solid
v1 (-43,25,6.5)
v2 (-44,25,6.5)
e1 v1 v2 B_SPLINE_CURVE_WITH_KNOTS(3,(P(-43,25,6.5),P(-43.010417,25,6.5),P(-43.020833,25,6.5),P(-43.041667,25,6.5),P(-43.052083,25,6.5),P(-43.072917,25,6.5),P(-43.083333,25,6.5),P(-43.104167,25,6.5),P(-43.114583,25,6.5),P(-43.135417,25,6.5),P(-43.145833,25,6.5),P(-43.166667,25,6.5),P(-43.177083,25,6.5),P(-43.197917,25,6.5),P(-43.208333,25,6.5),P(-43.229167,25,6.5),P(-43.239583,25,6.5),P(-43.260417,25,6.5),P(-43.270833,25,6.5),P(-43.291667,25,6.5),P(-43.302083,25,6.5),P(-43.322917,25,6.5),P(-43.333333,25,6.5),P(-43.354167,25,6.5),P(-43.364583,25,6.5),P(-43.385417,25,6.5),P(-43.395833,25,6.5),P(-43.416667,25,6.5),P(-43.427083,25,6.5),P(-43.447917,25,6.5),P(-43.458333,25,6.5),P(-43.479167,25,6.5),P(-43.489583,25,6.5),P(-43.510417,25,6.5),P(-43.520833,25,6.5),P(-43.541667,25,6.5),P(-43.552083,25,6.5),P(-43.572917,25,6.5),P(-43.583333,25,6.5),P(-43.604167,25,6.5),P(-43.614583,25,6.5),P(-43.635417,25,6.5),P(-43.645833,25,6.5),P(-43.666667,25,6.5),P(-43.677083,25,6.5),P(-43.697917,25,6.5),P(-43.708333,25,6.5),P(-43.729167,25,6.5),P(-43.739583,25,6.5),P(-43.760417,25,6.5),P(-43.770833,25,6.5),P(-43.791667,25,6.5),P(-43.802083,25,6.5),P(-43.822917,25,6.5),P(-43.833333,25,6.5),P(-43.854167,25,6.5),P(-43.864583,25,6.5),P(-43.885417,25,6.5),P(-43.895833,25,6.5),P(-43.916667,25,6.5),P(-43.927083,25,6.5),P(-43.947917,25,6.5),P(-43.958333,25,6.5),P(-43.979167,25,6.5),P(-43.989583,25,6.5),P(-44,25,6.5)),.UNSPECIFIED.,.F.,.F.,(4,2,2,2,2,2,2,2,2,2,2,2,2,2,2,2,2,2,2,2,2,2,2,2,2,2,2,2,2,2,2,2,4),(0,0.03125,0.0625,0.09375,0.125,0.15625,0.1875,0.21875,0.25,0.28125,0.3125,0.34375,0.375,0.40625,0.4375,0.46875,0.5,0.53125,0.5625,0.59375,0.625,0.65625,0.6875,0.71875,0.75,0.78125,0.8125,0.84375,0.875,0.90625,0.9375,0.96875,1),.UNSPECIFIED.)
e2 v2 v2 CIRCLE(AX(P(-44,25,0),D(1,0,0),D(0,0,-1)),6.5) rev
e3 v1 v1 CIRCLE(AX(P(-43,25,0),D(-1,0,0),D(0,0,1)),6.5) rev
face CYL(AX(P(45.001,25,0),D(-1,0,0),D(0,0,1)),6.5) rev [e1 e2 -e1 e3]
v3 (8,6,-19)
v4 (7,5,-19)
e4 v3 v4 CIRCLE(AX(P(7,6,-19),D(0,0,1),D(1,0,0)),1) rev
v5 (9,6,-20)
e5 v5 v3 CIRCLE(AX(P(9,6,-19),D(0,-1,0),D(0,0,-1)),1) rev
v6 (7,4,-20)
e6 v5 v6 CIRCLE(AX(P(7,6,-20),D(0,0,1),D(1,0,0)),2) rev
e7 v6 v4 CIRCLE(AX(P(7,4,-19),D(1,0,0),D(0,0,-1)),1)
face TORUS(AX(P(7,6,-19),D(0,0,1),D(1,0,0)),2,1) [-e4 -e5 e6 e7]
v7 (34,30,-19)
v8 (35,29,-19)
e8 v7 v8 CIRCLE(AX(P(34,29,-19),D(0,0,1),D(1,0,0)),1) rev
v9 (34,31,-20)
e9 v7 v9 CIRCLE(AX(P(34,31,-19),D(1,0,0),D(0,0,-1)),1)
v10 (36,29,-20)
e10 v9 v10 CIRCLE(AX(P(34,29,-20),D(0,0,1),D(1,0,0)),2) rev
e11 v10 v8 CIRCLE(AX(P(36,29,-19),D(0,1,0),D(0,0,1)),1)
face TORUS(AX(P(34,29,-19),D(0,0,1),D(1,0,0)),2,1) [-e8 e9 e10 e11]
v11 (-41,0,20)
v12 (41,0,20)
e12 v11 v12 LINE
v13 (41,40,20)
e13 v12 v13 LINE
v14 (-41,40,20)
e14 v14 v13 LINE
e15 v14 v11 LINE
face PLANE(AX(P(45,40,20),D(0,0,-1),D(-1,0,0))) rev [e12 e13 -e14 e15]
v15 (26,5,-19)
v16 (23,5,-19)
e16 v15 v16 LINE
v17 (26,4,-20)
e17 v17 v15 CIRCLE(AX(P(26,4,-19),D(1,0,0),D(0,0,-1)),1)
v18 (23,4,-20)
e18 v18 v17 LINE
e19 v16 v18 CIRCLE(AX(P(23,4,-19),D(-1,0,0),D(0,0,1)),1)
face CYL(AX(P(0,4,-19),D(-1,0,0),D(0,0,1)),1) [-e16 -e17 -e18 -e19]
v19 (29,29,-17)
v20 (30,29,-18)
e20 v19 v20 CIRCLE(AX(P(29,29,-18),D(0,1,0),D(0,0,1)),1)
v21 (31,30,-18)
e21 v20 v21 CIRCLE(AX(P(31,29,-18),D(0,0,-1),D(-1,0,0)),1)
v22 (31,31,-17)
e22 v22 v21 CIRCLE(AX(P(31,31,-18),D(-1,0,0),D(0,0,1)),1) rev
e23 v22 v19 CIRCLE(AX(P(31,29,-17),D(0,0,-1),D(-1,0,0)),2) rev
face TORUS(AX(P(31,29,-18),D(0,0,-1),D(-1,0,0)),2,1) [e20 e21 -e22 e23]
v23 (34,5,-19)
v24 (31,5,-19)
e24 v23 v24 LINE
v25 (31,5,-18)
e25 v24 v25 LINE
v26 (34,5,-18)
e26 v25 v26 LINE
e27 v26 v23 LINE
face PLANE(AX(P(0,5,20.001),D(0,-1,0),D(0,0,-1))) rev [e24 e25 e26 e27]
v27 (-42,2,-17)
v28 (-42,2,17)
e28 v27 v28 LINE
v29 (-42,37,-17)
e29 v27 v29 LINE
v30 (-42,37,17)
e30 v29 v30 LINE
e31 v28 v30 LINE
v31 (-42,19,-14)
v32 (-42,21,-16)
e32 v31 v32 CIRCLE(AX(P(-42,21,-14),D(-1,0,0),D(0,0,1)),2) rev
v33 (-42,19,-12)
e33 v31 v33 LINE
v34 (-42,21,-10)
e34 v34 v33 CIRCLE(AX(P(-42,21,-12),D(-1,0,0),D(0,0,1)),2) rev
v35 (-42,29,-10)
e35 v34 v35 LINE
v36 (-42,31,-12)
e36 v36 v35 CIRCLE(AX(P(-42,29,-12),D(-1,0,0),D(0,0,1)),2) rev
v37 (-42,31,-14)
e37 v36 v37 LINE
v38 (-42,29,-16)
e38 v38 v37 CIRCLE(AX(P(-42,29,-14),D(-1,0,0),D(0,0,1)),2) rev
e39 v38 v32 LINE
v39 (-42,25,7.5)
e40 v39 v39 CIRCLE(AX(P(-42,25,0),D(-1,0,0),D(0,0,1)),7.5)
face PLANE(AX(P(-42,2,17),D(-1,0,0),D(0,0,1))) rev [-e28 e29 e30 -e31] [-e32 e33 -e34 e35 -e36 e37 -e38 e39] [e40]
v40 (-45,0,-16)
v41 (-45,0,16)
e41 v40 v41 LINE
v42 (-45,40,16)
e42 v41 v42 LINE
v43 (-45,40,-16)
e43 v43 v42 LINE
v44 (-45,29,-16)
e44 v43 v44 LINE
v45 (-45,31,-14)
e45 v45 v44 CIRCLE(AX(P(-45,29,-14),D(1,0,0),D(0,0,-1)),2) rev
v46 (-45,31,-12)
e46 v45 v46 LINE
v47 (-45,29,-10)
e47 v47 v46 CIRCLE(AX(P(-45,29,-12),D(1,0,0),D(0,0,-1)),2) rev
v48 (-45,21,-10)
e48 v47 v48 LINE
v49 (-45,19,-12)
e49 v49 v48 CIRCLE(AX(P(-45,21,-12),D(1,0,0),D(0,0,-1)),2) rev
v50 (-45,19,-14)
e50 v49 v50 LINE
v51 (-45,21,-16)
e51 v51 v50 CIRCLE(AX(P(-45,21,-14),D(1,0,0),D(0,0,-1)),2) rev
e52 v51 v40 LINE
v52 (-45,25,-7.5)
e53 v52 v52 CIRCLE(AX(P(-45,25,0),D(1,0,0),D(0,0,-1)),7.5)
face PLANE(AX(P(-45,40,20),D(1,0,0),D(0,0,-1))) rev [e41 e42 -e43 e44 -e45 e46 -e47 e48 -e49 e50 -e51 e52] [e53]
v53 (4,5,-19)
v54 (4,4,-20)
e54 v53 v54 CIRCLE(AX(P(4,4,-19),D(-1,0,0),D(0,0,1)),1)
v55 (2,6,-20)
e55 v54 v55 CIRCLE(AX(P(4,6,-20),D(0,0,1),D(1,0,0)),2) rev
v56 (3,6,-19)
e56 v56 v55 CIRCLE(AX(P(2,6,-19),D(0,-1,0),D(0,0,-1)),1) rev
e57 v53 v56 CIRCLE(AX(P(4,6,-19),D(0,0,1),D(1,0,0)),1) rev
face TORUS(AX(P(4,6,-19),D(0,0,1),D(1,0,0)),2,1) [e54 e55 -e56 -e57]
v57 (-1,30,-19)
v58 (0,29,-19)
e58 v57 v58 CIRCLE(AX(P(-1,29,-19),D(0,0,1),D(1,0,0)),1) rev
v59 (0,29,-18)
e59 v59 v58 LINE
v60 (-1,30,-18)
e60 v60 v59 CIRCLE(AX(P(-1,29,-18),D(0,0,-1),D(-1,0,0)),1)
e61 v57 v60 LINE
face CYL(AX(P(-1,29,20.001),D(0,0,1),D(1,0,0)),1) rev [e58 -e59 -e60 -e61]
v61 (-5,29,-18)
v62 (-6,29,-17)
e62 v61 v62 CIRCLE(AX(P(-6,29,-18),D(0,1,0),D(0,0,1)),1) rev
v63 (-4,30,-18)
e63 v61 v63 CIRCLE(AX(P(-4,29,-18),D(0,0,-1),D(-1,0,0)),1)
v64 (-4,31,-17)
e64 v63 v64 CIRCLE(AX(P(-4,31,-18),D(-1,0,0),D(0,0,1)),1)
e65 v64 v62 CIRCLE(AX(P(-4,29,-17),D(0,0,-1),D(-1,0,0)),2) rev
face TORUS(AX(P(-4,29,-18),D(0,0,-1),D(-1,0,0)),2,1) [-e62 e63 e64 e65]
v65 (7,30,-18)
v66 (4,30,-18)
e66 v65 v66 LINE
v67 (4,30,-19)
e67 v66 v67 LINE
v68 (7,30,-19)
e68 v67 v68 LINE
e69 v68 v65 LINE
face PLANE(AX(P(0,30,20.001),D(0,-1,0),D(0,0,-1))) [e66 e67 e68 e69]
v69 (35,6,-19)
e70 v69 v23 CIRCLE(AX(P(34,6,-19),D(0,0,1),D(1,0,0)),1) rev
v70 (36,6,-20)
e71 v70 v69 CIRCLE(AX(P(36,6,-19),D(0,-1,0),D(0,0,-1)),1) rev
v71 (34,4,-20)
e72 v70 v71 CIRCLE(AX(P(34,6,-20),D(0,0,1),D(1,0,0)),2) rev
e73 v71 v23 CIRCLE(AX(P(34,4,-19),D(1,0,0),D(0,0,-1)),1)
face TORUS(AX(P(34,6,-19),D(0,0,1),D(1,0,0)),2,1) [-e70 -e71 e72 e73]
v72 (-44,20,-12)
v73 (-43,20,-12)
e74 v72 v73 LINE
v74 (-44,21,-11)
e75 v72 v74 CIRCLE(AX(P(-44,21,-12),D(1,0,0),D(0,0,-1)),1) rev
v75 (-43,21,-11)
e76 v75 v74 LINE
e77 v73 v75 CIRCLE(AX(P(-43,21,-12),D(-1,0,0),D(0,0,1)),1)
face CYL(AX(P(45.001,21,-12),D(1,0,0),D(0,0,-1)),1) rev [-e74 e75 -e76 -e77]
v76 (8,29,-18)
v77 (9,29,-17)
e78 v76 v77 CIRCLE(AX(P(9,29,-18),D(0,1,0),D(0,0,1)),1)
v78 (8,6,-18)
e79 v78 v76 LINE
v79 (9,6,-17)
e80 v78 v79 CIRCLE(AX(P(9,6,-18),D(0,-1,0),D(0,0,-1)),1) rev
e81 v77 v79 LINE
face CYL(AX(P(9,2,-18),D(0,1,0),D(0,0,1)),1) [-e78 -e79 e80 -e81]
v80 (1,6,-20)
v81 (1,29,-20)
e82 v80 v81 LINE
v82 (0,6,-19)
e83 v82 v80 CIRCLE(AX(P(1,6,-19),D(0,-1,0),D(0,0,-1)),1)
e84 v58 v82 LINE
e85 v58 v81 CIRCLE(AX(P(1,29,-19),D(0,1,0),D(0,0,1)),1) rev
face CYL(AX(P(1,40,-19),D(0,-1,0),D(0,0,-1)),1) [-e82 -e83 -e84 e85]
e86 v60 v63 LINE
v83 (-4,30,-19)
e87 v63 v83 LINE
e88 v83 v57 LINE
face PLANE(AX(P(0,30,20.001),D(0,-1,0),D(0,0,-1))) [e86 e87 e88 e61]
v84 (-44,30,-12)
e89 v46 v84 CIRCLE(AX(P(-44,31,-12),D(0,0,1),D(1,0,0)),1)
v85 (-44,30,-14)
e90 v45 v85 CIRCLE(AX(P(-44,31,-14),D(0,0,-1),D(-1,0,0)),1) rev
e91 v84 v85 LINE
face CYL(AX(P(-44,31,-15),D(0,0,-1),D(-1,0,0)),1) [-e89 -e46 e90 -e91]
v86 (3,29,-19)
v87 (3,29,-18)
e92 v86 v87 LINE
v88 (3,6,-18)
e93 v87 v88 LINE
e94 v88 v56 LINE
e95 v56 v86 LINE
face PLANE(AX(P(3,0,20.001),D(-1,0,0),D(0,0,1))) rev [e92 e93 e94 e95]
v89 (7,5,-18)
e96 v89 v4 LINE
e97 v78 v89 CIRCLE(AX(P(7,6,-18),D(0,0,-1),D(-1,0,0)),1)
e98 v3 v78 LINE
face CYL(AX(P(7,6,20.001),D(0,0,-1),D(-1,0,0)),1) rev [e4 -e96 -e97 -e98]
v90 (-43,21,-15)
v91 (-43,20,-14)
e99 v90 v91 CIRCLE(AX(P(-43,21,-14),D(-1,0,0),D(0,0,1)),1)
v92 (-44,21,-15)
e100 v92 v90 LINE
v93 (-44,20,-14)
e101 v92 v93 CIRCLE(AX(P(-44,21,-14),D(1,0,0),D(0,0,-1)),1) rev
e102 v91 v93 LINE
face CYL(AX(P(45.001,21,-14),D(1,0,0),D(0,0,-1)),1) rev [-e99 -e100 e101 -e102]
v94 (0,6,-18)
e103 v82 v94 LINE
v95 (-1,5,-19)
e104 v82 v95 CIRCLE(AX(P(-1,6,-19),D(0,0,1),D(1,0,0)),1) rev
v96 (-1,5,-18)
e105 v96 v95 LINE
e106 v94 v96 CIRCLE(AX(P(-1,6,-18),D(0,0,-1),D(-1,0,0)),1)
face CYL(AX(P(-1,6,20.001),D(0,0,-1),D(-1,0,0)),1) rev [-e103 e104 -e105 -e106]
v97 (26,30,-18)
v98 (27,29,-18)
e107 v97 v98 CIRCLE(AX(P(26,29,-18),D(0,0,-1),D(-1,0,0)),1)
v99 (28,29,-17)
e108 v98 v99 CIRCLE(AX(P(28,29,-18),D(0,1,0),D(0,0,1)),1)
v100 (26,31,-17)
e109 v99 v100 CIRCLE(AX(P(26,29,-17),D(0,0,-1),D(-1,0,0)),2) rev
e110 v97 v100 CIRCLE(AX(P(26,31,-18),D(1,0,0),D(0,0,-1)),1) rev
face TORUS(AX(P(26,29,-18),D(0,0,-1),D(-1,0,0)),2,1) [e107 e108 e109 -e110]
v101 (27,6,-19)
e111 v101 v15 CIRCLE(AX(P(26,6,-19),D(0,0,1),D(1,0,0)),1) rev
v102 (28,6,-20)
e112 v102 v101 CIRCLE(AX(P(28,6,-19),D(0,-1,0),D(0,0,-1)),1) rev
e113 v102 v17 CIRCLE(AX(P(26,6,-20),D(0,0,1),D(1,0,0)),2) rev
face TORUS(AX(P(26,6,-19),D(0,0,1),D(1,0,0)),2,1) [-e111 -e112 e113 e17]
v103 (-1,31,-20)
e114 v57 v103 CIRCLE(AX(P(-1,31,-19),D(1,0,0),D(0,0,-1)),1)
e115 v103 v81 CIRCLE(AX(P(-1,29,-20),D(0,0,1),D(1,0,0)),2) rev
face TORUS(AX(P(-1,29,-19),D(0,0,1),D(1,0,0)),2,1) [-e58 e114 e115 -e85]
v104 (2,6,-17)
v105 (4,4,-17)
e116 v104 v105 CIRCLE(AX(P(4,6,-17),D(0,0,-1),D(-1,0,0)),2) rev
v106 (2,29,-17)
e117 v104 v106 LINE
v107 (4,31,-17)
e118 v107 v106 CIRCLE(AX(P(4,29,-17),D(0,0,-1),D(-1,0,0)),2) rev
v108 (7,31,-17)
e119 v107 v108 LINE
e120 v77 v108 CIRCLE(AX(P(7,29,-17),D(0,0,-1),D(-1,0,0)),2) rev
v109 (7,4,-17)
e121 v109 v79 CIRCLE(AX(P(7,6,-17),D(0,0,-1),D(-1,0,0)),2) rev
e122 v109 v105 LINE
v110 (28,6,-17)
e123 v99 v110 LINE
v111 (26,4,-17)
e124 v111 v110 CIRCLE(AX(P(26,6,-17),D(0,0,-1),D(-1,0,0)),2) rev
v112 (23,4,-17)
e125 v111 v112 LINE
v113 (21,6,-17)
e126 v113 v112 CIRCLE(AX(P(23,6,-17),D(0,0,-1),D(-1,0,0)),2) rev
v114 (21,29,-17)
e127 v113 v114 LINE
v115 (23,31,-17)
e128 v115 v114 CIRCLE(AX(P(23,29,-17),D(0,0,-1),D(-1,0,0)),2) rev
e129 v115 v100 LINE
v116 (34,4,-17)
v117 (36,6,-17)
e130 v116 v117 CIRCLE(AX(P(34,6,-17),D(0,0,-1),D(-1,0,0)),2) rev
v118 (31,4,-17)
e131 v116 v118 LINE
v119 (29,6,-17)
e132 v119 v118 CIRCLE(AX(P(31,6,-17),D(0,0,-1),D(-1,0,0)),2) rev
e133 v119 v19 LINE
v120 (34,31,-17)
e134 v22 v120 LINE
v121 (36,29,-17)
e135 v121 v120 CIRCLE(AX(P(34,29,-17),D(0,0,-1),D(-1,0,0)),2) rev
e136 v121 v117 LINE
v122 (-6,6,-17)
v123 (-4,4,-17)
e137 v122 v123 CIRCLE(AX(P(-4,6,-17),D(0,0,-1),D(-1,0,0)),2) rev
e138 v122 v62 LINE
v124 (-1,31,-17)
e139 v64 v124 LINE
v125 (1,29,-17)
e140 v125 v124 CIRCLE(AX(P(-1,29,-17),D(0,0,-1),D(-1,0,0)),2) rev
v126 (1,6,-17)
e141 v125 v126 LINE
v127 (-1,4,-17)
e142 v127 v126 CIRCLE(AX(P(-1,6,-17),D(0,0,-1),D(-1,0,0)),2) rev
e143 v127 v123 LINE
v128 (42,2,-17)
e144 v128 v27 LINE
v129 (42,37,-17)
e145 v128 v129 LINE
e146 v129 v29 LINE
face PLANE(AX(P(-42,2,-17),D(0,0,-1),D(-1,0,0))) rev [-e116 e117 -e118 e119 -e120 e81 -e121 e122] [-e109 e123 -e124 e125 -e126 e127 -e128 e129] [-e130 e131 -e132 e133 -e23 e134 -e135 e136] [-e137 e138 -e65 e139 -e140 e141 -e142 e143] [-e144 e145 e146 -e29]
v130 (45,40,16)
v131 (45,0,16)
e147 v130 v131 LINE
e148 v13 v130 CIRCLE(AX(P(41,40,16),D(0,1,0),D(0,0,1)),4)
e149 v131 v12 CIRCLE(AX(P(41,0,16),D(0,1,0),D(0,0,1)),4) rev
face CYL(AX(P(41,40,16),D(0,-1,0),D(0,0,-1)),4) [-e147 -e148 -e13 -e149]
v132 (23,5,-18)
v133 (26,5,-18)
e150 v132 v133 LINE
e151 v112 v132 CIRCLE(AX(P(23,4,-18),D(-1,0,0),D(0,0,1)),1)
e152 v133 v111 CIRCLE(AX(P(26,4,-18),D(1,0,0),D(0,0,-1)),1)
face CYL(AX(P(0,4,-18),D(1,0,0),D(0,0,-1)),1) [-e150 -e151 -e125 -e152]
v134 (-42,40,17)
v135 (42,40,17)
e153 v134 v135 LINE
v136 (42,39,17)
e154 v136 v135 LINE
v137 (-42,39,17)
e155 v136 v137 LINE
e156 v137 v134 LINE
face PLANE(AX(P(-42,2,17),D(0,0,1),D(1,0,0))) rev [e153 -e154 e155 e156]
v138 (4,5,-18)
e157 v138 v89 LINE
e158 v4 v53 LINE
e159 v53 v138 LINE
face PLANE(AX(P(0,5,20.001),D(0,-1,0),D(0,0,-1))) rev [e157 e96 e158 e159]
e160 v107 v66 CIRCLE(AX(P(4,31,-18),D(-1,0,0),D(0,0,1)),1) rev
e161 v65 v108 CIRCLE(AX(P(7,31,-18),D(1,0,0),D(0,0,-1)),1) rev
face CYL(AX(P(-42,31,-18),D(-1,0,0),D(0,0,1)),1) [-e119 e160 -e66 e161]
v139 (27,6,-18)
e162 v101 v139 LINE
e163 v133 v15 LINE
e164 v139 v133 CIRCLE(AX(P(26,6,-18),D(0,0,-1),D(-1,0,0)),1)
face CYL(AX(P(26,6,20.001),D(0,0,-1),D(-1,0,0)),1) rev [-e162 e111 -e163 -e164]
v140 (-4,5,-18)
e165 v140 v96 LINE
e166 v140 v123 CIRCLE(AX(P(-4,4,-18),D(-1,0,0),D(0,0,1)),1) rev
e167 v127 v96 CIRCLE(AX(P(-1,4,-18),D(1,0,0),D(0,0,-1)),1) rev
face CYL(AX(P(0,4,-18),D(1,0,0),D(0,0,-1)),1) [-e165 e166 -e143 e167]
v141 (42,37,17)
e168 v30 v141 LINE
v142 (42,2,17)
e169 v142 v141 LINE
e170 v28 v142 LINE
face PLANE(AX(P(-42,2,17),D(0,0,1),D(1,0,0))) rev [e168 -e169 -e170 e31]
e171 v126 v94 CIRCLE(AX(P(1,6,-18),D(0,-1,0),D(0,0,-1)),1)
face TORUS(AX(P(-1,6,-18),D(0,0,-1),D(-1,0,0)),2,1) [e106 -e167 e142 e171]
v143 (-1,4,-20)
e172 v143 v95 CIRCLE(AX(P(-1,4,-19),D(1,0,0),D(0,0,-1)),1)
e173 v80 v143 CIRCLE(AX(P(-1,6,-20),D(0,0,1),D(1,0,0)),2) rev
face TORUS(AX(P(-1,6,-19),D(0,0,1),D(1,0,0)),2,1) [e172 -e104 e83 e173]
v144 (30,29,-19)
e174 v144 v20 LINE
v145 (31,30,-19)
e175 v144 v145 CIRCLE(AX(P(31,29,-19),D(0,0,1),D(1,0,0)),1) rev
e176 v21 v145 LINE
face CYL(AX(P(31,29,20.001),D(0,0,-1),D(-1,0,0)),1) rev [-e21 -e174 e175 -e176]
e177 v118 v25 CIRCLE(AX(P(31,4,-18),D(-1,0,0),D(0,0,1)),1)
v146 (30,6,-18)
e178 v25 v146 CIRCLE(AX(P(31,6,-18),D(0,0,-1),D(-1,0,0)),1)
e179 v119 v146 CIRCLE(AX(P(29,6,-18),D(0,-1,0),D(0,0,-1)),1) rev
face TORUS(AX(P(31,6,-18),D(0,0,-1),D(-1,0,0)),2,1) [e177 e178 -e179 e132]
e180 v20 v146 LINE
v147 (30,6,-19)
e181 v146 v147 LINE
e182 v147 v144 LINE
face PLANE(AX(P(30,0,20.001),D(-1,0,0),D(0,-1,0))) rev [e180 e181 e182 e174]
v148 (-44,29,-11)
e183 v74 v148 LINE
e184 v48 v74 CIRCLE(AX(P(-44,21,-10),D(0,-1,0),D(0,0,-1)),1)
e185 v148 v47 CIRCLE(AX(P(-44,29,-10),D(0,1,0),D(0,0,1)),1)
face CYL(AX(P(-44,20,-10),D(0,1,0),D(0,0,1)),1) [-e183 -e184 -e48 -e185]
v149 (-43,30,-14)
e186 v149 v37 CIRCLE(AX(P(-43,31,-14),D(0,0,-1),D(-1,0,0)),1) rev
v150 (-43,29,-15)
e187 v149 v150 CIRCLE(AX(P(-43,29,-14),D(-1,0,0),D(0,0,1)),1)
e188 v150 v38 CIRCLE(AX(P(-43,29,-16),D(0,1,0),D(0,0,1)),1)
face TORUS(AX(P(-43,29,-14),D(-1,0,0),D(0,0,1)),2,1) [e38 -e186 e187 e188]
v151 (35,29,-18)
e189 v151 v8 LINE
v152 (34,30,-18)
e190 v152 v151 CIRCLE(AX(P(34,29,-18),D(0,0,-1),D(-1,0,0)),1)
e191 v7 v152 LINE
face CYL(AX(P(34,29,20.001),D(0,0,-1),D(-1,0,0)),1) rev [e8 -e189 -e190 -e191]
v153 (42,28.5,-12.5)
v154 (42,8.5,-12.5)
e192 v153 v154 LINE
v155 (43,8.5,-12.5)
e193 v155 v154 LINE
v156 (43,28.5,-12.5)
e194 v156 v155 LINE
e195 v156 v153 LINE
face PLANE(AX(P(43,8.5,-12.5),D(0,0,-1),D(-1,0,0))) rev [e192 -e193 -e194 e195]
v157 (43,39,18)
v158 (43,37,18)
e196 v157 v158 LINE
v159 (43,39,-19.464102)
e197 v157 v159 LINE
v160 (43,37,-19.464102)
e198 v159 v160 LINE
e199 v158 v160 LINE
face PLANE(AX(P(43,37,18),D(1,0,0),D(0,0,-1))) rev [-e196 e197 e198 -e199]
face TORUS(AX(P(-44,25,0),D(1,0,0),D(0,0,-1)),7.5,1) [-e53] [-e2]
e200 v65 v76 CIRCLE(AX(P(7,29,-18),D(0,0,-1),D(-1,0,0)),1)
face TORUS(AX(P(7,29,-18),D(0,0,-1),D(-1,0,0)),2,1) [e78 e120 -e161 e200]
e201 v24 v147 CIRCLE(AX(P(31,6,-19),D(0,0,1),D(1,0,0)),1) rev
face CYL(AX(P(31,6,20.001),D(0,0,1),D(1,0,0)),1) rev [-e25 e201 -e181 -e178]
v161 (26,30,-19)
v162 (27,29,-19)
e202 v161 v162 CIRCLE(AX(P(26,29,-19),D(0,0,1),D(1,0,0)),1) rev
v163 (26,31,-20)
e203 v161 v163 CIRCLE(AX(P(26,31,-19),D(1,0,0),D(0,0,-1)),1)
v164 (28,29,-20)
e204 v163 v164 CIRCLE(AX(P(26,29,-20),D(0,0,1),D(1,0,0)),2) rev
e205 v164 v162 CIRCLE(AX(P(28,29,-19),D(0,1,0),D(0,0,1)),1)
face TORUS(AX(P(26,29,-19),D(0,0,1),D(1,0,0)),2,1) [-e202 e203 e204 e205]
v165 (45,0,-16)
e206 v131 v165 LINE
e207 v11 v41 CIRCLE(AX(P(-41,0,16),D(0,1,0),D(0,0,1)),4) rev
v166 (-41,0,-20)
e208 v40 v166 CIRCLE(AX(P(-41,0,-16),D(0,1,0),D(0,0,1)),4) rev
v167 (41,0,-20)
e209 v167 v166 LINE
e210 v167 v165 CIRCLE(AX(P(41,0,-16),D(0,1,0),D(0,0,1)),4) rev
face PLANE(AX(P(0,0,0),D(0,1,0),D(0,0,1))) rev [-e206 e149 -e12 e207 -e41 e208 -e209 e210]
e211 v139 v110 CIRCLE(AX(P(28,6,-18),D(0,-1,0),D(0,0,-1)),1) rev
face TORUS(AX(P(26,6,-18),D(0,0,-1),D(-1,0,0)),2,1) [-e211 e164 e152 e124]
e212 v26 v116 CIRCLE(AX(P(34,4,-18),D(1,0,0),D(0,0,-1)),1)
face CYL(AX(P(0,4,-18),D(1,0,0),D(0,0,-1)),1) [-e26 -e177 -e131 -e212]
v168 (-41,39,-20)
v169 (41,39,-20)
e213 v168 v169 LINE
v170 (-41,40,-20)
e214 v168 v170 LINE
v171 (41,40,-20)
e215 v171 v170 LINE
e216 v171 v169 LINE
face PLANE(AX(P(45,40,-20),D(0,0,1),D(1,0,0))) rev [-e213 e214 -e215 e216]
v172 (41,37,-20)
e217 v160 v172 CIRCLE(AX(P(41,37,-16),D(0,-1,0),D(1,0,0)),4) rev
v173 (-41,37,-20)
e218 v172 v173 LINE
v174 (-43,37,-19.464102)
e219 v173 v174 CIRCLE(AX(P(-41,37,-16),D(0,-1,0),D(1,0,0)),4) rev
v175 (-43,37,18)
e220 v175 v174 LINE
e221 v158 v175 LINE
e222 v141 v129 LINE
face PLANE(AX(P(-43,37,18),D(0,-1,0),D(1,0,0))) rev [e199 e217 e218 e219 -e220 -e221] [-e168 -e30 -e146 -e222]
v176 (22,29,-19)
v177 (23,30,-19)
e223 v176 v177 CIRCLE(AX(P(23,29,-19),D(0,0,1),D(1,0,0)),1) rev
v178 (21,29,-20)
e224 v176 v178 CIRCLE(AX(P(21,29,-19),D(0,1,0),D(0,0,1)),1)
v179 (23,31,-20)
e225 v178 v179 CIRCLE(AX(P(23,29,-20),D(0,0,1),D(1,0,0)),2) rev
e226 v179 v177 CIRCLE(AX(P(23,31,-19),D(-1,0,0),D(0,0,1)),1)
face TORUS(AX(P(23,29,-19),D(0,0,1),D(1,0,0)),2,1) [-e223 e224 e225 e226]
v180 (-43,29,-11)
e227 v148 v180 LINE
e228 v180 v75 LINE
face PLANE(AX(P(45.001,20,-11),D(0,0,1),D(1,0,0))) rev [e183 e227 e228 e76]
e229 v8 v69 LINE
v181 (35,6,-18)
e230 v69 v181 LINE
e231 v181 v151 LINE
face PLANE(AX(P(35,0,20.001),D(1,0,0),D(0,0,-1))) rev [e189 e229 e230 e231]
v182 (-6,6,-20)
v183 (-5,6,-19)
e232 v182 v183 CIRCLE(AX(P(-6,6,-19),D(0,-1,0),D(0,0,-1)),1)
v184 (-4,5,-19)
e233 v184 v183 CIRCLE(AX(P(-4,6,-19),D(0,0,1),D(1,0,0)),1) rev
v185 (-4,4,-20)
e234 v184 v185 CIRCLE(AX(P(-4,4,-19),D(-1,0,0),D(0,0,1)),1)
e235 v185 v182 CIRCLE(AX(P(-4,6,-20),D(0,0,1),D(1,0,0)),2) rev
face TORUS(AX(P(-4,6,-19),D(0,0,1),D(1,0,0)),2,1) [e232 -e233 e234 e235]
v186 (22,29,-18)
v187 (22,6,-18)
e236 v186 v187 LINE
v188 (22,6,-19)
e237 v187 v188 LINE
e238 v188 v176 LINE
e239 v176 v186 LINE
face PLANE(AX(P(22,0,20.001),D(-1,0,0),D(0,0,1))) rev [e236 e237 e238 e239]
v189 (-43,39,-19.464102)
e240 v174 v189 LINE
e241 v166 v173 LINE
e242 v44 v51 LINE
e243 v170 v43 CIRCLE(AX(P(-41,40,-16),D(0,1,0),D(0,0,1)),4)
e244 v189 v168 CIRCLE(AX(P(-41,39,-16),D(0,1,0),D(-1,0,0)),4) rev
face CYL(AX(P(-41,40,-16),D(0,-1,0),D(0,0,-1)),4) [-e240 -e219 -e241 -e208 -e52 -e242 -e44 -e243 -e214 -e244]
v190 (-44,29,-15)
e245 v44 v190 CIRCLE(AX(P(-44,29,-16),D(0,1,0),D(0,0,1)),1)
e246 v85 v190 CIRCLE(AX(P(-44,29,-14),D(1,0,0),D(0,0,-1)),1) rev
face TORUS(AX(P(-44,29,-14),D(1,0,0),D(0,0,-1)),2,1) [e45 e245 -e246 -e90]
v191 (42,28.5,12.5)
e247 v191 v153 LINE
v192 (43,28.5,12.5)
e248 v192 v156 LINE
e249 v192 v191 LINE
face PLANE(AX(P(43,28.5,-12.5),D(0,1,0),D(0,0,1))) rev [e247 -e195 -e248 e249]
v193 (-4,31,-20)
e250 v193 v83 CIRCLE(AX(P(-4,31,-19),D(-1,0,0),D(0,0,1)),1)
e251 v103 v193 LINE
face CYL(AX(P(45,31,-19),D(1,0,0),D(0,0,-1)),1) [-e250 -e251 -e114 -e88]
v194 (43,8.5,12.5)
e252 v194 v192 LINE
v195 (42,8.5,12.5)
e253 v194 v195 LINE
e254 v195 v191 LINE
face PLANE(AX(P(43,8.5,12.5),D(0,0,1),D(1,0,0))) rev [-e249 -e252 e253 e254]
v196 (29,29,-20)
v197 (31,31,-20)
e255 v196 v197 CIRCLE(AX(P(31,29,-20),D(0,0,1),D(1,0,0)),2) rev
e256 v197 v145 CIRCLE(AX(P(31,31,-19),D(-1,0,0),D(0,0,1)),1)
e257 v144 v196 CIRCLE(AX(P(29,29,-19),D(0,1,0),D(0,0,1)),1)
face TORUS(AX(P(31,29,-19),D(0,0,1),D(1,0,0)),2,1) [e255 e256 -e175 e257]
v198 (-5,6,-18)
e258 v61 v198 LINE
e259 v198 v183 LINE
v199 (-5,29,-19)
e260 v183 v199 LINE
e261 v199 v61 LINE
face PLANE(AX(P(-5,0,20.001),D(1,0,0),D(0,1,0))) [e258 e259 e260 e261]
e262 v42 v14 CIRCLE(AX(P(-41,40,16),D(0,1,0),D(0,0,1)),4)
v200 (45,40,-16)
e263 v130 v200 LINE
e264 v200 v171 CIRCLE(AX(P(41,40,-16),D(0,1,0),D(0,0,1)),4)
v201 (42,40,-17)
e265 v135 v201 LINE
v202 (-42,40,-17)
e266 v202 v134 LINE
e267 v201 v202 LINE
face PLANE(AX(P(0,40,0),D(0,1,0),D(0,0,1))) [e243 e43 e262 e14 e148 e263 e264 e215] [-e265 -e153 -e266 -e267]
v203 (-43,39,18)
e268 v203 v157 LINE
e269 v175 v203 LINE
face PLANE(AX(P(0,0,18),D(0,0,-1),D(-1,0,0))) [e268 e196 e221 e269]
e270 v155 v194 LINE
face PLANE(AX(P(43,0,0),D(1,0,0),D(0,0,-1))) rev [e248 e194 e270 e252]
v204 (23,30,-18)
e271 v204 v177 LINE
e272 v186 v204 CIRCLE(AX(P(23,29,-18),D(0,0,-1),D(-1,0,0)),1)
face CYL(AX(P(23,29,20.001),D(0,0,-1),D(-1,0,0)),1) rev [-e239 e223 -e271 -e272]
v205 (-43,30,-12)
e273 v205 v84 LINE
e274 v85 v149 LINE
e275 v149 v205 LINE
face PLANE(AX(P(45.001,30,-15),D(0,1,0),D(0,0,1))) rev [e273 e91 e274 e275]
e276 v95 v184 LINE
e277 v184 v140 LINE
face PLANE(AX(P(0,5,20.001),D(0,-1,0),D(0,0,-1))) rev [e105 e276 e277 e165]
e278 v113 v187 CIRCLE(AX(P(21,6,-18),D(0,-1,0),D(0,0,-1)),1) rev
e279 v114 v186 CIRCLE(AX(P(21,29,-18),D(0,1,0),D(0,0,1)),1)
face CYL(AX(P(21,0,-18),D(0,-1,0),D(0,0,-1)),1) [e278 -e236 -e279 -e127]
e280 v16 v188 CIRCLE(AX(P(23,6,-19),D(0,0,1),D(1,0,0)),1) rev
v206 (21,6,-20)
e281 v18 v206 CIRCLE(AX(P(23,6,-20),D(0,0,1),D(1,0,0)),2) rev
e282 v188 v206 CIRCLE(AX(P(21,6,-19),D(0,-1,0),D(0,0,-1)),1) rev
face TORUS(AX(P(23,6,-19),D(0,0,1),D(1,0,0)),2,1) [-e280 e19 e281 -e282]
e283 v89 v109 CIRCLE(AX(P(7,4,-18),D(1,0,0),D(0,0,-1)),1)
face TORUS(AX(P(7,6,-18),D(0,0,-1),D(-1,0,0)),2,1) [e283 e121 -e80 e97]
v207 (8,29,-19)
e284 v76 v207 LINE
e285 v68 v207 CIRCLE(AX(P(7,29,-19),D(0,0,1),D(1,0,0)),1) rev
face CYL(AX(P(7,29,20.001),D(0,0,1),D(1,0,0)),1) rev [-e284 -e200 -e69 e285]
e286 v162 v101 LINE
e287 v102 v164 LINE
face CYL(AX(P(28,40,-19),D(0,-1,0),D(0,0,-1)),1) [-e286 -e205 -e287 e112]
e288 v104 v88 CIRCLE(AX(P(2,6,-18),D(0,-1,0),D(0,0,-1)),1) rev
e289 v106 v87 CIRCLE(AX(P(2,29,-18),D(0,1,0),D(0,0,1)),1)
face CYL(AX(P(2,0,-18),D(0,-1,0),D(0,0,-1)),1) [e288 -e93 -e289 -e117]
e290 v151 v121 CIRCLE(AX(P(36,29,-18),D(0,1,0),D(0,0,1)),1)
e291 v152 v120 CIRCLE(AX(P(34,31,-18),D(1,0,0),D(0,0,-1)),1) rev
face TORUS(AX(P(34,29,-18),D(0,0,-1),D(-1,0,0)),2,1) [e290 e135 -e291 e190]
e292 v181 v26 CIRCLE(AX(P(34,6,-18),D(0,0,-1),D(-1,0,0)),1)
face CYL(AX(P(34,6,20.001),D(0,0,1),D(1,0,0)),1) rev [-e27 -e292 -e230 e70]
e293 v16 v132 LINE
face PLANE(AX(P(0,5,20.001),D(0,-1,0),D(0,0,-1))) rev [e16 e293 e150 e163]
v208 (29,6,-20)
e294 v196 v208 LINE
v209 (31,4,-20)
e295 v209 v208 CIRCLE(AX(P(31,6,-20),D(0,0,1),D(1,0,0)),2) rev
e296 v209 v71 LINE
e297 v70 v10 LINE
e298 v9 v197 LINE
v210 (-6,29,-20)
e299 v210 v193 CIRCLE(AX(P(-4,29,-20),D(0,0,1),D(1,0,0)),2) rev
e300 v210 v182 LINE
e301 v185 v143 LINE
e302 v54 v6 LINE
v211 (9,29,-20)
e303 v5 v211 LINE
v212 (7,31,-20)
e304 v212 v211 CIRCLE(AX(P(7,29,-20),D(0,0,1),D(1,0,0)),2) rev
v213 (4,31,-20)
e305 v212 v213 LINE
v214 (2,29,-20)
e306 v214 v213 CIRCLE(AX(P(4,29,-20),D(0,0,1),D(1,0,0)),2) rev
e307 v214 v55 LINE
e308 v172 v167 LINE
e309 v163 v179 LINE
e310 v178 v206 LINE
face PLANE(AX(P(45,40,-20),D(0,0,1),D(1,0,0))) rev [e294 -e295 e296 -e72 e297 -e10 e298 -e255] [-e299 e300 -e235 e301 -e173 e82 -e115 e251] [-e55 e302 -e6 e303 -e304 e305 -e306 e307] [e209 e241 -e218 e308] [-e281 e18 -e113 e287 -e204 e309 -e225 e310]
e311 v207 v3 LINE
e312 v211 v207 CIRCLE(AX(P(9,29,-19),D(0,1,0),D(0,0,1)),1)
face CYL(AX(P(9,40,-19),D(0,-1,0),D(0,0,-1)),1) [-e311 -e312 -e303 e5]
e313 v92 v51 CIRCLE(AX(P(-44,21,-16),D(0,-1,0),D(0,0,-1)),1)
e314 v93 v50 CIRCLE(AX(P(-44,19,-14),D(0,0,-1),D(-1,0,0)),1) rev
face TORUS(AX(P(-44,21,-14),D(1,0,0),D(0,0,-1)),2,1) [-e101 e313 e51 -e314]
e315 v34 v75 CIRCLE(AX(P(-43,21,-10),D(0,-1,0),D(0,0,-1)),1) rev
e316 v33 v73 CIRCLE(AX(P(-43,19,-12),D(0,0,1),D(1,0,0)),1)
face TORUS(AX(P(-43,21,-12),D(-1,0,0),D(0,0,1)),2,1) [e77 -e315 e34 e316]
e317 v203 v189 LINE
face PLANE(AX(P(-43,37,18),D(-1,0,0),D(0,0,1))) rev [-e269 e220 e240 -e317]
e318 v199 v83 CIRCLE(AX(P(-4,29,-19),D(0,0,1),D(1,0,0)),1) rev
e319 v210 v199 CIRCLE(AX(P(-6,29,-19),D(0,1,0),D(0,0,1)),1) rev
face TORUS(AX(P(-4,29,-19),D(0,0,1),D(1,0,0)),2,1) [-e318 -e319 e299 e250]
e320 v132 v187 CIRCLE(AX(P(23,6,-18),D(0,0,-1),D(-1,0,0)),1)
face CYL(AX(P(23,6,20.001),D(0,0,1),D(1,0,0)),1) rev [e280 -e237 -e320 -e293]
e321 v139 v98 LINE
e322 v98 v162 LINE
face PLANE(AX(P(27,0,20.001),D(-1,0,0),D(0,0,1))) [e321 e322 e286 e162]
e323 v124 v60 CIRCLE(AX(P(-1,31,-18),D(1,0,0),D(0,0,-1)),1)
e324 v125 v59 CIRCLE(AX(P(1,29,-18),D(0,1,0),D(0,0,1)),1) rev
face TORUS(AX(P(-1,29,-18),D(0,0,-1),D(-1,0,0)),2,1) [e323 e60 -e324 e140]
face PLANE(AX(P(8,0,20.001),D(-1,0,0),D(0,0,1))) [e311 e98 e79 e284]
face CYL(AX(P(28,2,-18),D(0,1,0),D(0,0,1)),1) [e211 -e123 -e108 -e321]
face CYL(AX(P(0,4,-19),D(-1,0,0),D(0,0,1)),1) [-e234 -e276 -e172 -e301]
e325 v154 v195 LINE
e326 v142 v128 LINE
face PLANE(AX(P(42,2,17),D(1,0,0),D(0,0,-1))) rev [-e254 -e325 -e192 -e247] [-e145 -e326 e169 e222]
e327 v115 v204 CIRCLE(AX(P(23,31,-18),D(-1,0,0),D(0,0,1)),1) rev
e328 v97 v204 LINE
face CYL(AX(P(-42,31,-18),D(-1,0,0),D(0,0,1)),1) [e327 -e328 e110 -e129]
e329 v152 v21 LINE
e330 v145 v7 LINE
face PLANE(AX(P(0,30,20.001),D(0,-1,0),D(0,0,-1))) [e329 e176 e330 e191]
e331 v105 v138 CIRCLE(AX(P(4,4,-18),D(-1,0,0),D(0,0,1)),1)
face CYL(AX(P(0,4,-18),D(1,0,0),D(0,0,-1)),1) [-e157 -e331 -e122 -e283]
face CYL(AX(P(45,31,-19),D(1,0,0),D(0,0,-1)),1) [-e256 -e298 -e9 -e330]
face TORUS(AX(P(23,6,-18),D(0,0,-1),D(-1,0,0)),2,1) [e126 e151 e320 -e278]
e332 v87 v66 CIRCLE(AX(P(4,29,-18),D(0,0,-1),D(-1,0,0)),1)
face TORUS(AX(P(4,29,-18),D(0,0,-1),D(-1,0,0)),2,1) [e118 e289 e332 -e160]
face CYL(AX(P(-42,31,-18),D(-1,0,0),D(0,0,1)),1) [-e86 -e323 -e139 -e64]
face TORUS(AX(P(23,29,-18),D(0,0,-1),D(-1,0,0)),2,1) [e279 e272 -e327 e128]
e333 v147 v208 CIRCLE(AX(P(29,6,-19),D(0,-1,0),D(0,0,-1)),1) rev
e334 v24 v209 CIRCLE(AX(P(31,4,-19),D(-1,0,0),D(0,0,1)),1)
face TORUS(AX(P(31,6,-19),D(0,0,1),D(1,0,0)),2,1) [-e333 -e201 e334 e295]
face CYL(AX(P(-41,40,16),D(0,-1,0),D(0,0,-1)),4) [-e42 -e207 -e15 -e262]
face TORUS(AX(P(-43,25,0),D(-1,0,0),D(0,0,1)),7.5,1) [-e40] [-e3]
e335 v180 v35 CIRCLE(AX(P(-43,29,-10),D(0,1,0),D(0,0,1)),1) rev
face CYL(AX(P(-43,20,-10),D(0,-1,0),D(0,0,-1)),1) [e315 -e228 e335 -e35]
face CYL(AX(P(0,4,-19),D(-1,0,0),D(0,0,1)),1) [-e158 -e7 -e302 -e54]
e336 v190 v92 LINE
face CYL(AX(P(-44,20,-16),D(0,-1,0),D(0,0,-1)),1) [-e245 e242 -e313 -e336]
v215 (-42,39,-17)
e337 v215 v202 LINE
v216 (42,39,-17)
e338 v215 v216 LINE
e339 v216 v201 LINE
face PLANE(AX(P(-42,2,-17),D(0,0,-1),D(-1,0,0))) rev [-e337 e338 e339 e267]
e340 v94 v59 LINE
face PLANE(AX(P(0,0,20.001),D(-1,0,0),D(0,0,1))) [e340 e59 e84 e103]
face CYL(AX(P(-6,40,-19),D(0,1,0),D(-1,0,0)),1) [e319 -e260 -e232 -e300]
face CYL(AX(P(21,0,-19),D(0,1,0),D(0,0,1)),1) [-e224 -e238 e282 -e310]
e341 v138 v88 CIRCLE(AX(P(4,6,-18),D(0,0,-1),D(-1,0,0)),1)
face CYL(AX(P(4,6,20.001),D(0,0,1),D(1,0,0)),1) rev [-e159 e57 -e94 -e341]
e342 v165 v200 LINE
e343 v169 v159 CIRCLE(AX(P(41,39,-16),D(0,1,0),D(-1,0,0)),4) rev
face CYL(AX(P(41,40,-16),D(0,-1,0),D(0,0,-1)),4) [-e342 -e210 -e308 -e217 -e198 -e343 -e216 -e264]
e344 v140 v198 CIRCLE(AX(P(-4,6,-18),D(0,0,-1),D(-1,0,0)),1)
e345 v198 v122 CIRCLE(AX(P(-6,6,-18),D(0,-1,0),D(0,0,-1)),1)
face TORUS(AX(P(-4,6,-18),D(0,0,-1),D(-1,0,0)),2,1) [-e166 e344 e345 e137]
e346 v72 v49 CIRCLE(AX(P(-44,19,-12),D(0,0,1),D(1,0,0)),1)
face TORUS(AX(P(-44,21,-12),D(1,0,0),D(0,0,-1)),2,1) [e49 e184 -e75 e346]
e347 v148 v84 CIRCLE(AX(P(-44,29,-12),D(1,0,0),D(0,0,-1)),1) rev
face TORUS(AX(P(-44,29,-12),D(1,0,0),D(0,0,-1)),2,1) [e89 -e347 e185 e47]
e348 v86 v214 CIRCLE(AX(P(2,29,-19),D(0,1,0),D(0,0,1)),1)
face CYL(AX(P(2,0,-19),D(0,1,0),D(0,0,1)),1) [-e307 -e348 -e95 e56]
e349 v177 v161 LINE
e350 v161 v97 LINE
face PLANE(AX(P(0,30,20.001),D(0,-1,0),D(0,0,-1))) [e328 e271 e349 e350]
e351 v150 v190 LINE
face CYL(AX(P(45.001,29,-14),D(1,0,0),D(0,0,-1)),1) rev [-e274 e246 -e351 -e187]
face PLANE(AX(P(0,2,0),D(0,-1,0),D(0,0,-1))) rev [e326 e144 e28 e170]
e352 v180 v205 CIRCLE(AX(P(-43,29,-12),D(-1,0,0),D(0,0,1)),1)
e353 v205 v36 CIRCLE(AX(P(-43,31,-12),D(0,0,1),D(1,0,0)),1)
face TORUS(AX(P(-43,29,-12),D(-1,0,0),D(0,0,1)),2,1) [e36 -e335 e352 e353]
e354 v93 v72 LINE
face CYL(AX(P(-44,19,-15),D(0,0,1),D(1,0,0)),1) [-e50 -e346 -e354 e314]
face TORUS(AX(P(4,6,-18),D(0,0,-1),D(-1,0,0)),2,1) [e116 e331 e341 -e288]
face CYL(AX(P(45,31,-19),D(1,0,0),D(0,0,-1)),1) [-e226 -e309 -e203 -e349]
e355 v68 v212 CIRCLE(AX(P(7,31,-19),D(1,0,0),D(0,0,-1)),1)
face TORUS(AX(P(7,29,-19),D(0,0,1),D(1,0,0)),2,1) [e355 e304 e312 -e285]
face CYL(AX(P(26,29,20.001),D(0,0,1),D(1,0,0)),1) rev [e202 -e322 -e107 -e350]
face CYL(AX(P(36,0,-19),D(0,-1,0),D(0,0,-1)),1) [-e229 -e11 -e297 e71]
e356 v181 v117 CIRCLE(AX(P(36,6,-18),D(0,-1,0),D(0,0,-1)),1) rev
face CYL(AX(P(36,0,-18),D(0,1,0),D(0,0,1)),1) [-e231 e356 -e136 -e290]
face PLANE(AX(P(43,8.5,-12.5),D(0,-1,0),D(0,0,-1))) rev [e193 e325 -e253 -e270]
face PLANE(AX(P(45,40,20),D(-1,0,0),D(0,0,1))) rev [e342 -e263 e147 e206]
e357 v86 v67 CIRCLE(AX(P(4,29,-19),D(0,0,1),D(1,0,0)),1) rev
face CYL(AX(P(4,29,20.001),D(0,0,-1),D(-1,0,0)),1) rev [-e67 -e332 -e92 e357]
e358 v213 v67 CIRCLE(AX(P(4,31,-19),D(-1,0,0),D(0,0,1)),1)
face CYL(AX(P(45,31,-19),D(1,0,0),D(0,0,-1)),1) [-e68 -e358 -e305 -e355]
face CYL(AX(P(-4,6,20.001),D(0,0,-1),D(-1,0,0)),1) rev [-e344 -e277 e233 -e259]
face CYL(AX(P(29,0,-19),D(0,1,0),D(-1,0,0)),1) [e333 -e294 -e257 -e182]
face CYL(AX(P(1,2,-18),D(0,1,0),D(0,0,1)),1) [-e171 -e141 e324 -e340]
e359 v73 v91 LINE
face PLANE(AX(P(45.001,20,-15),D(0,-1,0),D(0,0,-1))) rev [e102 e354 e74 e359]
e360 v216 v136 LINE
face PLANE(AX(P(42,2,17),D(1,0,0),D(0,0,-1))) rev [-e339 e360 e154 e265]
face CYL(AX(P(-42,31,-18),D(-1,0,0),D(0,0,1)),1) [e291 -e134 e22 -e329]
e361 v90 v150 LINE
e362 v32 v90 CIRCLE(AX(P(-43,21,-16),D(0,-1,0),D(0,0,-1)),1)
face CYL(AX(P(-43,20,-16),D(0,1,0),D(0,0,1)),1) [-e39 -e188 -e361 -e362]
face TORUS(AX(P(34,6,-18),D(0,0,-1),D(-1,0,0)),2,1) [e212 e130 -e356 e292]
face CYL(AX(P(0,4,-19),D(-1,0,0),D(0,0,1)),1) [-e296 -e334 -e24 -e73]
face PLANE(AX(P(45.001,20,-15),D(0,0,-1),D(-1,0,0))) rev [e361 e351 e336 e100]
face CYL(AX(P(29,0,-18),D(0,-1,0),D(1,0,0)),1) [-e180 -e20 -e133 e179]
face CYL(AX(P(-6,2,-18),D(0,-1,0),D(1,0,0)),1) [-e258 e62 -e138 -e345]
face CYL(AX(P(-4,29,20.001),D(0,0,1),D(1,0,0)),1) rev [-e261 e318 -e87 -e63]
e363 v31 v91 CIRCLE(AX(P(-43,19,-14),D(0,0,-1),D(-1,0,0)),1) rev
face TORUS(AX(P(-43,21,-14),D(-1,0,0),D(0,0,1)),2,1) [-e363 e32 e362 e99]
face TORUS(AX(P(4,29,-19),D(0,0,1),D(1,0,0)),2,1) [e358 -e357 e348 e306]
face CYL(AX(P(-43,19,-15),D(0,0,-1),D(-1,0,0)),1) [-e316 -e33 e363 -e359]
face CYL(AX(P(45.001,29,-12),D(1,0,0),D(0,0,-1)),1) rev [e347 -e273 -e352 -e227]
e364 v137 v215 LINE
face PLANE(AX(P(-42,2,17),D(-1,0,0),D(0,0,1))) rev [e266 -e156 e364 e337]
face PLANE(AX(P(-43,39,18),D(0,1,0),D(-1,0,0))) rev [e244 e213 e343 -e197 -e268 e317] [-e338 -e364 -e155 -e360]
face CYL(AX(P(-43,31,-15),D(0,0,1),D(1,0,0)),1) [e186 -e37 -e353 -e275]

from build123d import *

# Parameters (mm, degrees)
CROQUIS1_W              = 90
CROQUIS1_H              = 40
SALIENTE_EXTRUIR1_DEPTH = 40
CROQUIS2_W              = 84
CROQUIS2_H              = 34
CORTAR_EXTRUIR1_DEPTH   = 38
CROQUIS5_W              = 86
CROQUIS5_H              = 2
CORTAR_EXTRUIR2_DEPTH   = 38
CORTAR_EXTRUIR3_REACH   = 102.499
CROQUIS6_W              = 4
CROQUIS6_H              = 10
CORTAR_EXTRUIR4_REACH   = 74.284
CROQUIS7_W              = 5
CROQUIS7_H              = 25
CROQUIS8_W              = 25
CROQUIS8_H              = 20
CORTAR_EXTRUIR5_DEPTH   = 1
REDONDEO2_R             = 4
REDONDEO5_R             = 1
REDONDEO6_R             = 1
CORTAR_EXTRUIR6_REACH   = 102.499
CROQUIS9_R              = 6.5
REDONDEO7_R             = 1


# Some blends are built 0.0001 mm under size
with BuildPart() as part:
    # Croquis1 → Saliente-Extruir1 (new body)
    with BuildSketch(Plane(origin=(0, 0, 0), x_dir=(1, 0, 0), z_dir=(0, 1, 0))):
        Rectangle(CROQUIS1_W, CROQUIS1_H)
    extrude(amount=SALIENTE_EXTRUIR1_DEPTH)

    # Croquis2 → Cortar-Extruir1 (cut)
    with BuildSketch(Plane(origin=(0, 40, 0), x_dir=(1, 0, 0), z_dir=(0, 1, 0))):
        Rectangle(CROQUIS2_W, CROQUIS2_H)
    extrude(amount=-CORTAR_EXTRUIR1_DEPTH, mode=Mode.SUBTRACT)

    # Croquis5 → Cortar-Extruir2 (cut)
    with BuildSketch(Plane(origin=(0, 0, -20), x_dir=(-1, 0, 0), z_dir=(0, 0, -1))):
        with Locations((0, 38)):
            Rectangle(CROQUIS5_W, CROQUIS5_H)
    extrude(amount=-CORTAR_EXTRUIR2_DEPTH, mode=Mode.SUBTRACT)

    # Croquis6 → Cortar-Extruir3 (cut, up to next)
    with BuildSketch(Plane.ZY.offset(45), mode=Mode.PRIVATE) as cortar_extruir3_sk1:
        with Locations((-13, 25)):
            Rectangle(CROQUIS6_W, CROQUIS6_H)
    cortar_extruir3_tool1 = extrude(cortar_extruir3_sk1.sketch, amount=-CORTAR_EXTRUIR3_REACH, mode=Mode.PRIVATE) & part.part
    add(cortar_extruir3_tool1.solids().sort_by_distance((-45, 25, -13))[0], mode=Mode.SUBTRACT)

    # Croquis7 → Cortar-Extruir4 (cut, up to next)
    with BuildSketch(Plane(origin=(0, 0, -20), x_dir=(-1, 0, 0), z_dir=(0, 0, -1)), mode=Mode.PRIVATE) as cortar_extruir4_sk1:
        with Locations((-32.5, 17.5)):
            Rectangle(CROQUIS7_W, CROQUIS7_H)
    cortar_extruir4_tool1 = extrude(cortar_extruir4_sk1.sketch, amount=-CORTAR_EXTRUIR4_REACH, mode=Mode.PRIVATE) & part.part
    # Croquis7 → Cortar-Extruir4 (cut, up to next)
    with BuildSketch(Plane(origin=(0, 0, -20), x_dir=(-1, 0, 0), z_dir=(0, 0, -1)), mode=Mode.PRIVATE) as cortar_extruir4_sk2:
        with Locations((-24.5, 17.5)):
            Rectangle(CROQUIS7_W, CROQUIS7_H)
    cortar_extruir4_tool2 = extrude(cortar_extruir4_sk2.sketch, amount=-CORTAR_EXTRUIR4_REACH, mode=Mode.PRIVATE) & part.part
    # Croquis7 → Cortar-Extruir4 (cut, up to next)
    with BuildSketch(Plane(origin=(0, 0, -20), x_dir=(-1, 0, 0), z_dir=(0, 0, -1)), mode=Mode.PRIVATE) as cortar_extruir4_sk3:
        with Locations((-5.5, 17.5)):
            Rectangle(CROQUIS7_W, CROQUIS7_H)
    cortar_extruir4_tool3 = extrude(cortar_extruir4_sk3.sketch, amount=-CORTAR_EXTRUIR4_REACH, mode=Mode.PRIVATE) & part.part
    # Croquis7 → Cortar-Extruir4 (cut, up to next)
    with BuildSketch(Plane(origin=(0, 0, -20), x_dir=(-1, 0, 0), z_dir=(0, 0, -1)), mode=Mode.PRIVATE) as cortar_extruir4_sk4:
        with Locations((2.5, 17.5)):
            Rectangle(CROQUIS7_W, CROQUIS7_H)
    cortar_extruir4_tool4 = extrude(cortar_extruir4_sk4.sketch, amount=-CORTAR_EXTRUIR4_REACH, mode=Mode.PRIVATE) & part.part
    add(cortar_extruir4_tool1.solids().sort_by_distance((32.5, 17.5, -20))[0], mode=Mode.SUBTRACT)
    add(cortar_extruir4_tool2.solids().sort_by_distance((24.5, 17.5, -20))[0], mode=Mode.SUBTRACT)
    add(cortar_extruir4_tool3.solids().sort_by_distance((5.5, 17.5, -20))[0], mode=Mode.SUBTRACT)
    add(cortar_extruir4_tool4.solids().sort_by_distance((-2.5, 17.5, -20))[0], mode=Mode.SUBTRACT)

    # Croquis8 → Cortar-Extruir5 (cut)
    with BuildSketch(Plane.ZY.offset(-42)):
        with Locations((0, 18.5)):
            Rectangle(CROQUIS8_W, CROQUIS8_H)
    extrude(amount=-CORTAR_EXTRUIR5_DEPTH, mode=Mode.SUBTRACT)

    # Redondeo2
    # the kernel refuses this fillet: 4 mm, written as the material it takes off along each edge
    with BuildSketch(Plane(origin=(45, -10, 20), x_dir=(-1, 0, 0), z_dir=(0, 1, 0)), Plane(origin=(45, -10, -20), x_dir=(0, 0, 1), z_dir=(0, 1, 0))) as redondeo2_piece_1:
        with BuildLine():
            CenterArc((REDONDEO2_R, -REDONDEO2_R), REDONDEO2_R, 90, 90)
            Line((0, -REDONDEO2_R), (0, 0))
            Line((0, 0), (REDONDEO2_R, 0))
        make_face()
    extrude(amount=60, mode=Mode.SUBTRACT)
    with BuildSketch(Plane(origin=(-45, -10, -20), x_dir=(0, 0, 1), z_dir=(0, 1, 0)), Plane(origin=(-45, -10, 20), x_dir=(1, 0, 0), z_dir=(0, 1, 0))) as redondeo2_piece_2:
        with BuildLine():
            CenterArc((REDONDEO2_R, REDONDEO2_R), REDONDEO2_R, 180, 90)
            Line((0, REDONDEO2_R), (0, 0))
            Line((0, 0), (REDONDEO2_R, 0))
        make_face()
    extrude(amount=60, mode=Mode.SUBTRACT)

    # Redondeo5
    redondeo5_edges = [part.edges().sort_by_distance(p)[0] for p in [
        (3, 17.5, -20),
        (-2.5, 5, -17),
        (0, 17.5, -17),
        (0, 5, -18.5),
        (0, 17.5, -20),
        (-2.5, 30, -17),
        (0, 30, -18.5),
        (-2.5, 30, -20),
        (-5, 17.5, -17),
        (-5, 30, -18.5),
        (-5, 17.5, -20),
        (-5, 5, -18.5),
        (-2.5, 5, -20),
        (30, 17.5, -17),
        (32.5, 5, -17),
        (35, 17.5, -17),
        (30, 5, -18.5),
        (35, 5, -18.5),
        (32.5, 30, -17),
        (35, 30, -18.5),
        (32.5, 30, -20),
        (30, 30, -18.5),
        (32.5, 5, -20),
        (30, 17.5, -20),
        (35, 17.5, -20),
        (22, 17.5, -17),
        (24.5, 5, -17),
        (22, 5, -18.5),
        (27, 17.5, -17),
        (27, 5, -18.5),
        (27, 17.5, -20),
        (24.5, 30, -17),
        (27, 30, -18.5),
        (24.5, 30, -20),
        (22, 30, -18.5),
        (24.5, 5, -20),
        (22, 17.5, -20),
        (3, 17.5, -17),
        (5.5, 5, -17),
        (8, 17.5, -17),
        (8, 5, -18.5),
        (8, 17.5, -20),
        (5.5, 30, -17),
        (8, 30, -18.5),
        (5.5, 30, -20),
        (3, 30, -18.5),
        (3, 5, -18.5),
        (5.5, 5, -20),
    ]]
    fillet(redondeo5_edges, radius=REDONDEO5_R)

    # Redondeo6
    redondeo6_edges = [part.edges().sort_by_distance(p)[0] for p in [
        (-42, 20, -13),
        (-42, 25, -15),
        (-42, 30, -13),
        (-42, 25, -11),
        (-43.5, 20, -15),
        (-43.5, 30, -15),
        (-43.5, 30, -11),
        (-43.5, 20, -11),
        (-45, 25, -15),
        (-45, 20, -13),
        (-45, 25, -11),
        (-45, 30, -13),
    ]]
    fillet(redondeo6_edges, radius=REDONDEO6_R - 0.0001)  # a hair under: the kernel refuses the full size

    # Croquis9 → Cortar-Extruir6 (cut, up to next)
    with BuildSketch(Plane.ZY.offset(45), mode=Mode.PRIVATE) as cortar_extruir6_sk1:
        with Locations((0, 25)):
            Circle(CROQUIS9_R)
    cortar_extruir6_tool1 = extrude(cortar_extruir6_sk1.sketch, amount=-CORTAR_EXTRUIR6_REACH, mode=Mode.PRIVATE) & part.part
    add(cortar_extruir6_tool1.solids().sort_by_distance((-45, 25, 0))[0], mode=Mode.SUBTRACT)

    # Redondeo7
    redondeo7_edges = [part.edges().sort_by_distance(p)[0] for p in [
        (-45, 25, -6.5),
        (-42, 25, -6.5),
    ]]
    fillet(redondeo7_edges, radius=REDONDEO7_R)


solid = part.part
